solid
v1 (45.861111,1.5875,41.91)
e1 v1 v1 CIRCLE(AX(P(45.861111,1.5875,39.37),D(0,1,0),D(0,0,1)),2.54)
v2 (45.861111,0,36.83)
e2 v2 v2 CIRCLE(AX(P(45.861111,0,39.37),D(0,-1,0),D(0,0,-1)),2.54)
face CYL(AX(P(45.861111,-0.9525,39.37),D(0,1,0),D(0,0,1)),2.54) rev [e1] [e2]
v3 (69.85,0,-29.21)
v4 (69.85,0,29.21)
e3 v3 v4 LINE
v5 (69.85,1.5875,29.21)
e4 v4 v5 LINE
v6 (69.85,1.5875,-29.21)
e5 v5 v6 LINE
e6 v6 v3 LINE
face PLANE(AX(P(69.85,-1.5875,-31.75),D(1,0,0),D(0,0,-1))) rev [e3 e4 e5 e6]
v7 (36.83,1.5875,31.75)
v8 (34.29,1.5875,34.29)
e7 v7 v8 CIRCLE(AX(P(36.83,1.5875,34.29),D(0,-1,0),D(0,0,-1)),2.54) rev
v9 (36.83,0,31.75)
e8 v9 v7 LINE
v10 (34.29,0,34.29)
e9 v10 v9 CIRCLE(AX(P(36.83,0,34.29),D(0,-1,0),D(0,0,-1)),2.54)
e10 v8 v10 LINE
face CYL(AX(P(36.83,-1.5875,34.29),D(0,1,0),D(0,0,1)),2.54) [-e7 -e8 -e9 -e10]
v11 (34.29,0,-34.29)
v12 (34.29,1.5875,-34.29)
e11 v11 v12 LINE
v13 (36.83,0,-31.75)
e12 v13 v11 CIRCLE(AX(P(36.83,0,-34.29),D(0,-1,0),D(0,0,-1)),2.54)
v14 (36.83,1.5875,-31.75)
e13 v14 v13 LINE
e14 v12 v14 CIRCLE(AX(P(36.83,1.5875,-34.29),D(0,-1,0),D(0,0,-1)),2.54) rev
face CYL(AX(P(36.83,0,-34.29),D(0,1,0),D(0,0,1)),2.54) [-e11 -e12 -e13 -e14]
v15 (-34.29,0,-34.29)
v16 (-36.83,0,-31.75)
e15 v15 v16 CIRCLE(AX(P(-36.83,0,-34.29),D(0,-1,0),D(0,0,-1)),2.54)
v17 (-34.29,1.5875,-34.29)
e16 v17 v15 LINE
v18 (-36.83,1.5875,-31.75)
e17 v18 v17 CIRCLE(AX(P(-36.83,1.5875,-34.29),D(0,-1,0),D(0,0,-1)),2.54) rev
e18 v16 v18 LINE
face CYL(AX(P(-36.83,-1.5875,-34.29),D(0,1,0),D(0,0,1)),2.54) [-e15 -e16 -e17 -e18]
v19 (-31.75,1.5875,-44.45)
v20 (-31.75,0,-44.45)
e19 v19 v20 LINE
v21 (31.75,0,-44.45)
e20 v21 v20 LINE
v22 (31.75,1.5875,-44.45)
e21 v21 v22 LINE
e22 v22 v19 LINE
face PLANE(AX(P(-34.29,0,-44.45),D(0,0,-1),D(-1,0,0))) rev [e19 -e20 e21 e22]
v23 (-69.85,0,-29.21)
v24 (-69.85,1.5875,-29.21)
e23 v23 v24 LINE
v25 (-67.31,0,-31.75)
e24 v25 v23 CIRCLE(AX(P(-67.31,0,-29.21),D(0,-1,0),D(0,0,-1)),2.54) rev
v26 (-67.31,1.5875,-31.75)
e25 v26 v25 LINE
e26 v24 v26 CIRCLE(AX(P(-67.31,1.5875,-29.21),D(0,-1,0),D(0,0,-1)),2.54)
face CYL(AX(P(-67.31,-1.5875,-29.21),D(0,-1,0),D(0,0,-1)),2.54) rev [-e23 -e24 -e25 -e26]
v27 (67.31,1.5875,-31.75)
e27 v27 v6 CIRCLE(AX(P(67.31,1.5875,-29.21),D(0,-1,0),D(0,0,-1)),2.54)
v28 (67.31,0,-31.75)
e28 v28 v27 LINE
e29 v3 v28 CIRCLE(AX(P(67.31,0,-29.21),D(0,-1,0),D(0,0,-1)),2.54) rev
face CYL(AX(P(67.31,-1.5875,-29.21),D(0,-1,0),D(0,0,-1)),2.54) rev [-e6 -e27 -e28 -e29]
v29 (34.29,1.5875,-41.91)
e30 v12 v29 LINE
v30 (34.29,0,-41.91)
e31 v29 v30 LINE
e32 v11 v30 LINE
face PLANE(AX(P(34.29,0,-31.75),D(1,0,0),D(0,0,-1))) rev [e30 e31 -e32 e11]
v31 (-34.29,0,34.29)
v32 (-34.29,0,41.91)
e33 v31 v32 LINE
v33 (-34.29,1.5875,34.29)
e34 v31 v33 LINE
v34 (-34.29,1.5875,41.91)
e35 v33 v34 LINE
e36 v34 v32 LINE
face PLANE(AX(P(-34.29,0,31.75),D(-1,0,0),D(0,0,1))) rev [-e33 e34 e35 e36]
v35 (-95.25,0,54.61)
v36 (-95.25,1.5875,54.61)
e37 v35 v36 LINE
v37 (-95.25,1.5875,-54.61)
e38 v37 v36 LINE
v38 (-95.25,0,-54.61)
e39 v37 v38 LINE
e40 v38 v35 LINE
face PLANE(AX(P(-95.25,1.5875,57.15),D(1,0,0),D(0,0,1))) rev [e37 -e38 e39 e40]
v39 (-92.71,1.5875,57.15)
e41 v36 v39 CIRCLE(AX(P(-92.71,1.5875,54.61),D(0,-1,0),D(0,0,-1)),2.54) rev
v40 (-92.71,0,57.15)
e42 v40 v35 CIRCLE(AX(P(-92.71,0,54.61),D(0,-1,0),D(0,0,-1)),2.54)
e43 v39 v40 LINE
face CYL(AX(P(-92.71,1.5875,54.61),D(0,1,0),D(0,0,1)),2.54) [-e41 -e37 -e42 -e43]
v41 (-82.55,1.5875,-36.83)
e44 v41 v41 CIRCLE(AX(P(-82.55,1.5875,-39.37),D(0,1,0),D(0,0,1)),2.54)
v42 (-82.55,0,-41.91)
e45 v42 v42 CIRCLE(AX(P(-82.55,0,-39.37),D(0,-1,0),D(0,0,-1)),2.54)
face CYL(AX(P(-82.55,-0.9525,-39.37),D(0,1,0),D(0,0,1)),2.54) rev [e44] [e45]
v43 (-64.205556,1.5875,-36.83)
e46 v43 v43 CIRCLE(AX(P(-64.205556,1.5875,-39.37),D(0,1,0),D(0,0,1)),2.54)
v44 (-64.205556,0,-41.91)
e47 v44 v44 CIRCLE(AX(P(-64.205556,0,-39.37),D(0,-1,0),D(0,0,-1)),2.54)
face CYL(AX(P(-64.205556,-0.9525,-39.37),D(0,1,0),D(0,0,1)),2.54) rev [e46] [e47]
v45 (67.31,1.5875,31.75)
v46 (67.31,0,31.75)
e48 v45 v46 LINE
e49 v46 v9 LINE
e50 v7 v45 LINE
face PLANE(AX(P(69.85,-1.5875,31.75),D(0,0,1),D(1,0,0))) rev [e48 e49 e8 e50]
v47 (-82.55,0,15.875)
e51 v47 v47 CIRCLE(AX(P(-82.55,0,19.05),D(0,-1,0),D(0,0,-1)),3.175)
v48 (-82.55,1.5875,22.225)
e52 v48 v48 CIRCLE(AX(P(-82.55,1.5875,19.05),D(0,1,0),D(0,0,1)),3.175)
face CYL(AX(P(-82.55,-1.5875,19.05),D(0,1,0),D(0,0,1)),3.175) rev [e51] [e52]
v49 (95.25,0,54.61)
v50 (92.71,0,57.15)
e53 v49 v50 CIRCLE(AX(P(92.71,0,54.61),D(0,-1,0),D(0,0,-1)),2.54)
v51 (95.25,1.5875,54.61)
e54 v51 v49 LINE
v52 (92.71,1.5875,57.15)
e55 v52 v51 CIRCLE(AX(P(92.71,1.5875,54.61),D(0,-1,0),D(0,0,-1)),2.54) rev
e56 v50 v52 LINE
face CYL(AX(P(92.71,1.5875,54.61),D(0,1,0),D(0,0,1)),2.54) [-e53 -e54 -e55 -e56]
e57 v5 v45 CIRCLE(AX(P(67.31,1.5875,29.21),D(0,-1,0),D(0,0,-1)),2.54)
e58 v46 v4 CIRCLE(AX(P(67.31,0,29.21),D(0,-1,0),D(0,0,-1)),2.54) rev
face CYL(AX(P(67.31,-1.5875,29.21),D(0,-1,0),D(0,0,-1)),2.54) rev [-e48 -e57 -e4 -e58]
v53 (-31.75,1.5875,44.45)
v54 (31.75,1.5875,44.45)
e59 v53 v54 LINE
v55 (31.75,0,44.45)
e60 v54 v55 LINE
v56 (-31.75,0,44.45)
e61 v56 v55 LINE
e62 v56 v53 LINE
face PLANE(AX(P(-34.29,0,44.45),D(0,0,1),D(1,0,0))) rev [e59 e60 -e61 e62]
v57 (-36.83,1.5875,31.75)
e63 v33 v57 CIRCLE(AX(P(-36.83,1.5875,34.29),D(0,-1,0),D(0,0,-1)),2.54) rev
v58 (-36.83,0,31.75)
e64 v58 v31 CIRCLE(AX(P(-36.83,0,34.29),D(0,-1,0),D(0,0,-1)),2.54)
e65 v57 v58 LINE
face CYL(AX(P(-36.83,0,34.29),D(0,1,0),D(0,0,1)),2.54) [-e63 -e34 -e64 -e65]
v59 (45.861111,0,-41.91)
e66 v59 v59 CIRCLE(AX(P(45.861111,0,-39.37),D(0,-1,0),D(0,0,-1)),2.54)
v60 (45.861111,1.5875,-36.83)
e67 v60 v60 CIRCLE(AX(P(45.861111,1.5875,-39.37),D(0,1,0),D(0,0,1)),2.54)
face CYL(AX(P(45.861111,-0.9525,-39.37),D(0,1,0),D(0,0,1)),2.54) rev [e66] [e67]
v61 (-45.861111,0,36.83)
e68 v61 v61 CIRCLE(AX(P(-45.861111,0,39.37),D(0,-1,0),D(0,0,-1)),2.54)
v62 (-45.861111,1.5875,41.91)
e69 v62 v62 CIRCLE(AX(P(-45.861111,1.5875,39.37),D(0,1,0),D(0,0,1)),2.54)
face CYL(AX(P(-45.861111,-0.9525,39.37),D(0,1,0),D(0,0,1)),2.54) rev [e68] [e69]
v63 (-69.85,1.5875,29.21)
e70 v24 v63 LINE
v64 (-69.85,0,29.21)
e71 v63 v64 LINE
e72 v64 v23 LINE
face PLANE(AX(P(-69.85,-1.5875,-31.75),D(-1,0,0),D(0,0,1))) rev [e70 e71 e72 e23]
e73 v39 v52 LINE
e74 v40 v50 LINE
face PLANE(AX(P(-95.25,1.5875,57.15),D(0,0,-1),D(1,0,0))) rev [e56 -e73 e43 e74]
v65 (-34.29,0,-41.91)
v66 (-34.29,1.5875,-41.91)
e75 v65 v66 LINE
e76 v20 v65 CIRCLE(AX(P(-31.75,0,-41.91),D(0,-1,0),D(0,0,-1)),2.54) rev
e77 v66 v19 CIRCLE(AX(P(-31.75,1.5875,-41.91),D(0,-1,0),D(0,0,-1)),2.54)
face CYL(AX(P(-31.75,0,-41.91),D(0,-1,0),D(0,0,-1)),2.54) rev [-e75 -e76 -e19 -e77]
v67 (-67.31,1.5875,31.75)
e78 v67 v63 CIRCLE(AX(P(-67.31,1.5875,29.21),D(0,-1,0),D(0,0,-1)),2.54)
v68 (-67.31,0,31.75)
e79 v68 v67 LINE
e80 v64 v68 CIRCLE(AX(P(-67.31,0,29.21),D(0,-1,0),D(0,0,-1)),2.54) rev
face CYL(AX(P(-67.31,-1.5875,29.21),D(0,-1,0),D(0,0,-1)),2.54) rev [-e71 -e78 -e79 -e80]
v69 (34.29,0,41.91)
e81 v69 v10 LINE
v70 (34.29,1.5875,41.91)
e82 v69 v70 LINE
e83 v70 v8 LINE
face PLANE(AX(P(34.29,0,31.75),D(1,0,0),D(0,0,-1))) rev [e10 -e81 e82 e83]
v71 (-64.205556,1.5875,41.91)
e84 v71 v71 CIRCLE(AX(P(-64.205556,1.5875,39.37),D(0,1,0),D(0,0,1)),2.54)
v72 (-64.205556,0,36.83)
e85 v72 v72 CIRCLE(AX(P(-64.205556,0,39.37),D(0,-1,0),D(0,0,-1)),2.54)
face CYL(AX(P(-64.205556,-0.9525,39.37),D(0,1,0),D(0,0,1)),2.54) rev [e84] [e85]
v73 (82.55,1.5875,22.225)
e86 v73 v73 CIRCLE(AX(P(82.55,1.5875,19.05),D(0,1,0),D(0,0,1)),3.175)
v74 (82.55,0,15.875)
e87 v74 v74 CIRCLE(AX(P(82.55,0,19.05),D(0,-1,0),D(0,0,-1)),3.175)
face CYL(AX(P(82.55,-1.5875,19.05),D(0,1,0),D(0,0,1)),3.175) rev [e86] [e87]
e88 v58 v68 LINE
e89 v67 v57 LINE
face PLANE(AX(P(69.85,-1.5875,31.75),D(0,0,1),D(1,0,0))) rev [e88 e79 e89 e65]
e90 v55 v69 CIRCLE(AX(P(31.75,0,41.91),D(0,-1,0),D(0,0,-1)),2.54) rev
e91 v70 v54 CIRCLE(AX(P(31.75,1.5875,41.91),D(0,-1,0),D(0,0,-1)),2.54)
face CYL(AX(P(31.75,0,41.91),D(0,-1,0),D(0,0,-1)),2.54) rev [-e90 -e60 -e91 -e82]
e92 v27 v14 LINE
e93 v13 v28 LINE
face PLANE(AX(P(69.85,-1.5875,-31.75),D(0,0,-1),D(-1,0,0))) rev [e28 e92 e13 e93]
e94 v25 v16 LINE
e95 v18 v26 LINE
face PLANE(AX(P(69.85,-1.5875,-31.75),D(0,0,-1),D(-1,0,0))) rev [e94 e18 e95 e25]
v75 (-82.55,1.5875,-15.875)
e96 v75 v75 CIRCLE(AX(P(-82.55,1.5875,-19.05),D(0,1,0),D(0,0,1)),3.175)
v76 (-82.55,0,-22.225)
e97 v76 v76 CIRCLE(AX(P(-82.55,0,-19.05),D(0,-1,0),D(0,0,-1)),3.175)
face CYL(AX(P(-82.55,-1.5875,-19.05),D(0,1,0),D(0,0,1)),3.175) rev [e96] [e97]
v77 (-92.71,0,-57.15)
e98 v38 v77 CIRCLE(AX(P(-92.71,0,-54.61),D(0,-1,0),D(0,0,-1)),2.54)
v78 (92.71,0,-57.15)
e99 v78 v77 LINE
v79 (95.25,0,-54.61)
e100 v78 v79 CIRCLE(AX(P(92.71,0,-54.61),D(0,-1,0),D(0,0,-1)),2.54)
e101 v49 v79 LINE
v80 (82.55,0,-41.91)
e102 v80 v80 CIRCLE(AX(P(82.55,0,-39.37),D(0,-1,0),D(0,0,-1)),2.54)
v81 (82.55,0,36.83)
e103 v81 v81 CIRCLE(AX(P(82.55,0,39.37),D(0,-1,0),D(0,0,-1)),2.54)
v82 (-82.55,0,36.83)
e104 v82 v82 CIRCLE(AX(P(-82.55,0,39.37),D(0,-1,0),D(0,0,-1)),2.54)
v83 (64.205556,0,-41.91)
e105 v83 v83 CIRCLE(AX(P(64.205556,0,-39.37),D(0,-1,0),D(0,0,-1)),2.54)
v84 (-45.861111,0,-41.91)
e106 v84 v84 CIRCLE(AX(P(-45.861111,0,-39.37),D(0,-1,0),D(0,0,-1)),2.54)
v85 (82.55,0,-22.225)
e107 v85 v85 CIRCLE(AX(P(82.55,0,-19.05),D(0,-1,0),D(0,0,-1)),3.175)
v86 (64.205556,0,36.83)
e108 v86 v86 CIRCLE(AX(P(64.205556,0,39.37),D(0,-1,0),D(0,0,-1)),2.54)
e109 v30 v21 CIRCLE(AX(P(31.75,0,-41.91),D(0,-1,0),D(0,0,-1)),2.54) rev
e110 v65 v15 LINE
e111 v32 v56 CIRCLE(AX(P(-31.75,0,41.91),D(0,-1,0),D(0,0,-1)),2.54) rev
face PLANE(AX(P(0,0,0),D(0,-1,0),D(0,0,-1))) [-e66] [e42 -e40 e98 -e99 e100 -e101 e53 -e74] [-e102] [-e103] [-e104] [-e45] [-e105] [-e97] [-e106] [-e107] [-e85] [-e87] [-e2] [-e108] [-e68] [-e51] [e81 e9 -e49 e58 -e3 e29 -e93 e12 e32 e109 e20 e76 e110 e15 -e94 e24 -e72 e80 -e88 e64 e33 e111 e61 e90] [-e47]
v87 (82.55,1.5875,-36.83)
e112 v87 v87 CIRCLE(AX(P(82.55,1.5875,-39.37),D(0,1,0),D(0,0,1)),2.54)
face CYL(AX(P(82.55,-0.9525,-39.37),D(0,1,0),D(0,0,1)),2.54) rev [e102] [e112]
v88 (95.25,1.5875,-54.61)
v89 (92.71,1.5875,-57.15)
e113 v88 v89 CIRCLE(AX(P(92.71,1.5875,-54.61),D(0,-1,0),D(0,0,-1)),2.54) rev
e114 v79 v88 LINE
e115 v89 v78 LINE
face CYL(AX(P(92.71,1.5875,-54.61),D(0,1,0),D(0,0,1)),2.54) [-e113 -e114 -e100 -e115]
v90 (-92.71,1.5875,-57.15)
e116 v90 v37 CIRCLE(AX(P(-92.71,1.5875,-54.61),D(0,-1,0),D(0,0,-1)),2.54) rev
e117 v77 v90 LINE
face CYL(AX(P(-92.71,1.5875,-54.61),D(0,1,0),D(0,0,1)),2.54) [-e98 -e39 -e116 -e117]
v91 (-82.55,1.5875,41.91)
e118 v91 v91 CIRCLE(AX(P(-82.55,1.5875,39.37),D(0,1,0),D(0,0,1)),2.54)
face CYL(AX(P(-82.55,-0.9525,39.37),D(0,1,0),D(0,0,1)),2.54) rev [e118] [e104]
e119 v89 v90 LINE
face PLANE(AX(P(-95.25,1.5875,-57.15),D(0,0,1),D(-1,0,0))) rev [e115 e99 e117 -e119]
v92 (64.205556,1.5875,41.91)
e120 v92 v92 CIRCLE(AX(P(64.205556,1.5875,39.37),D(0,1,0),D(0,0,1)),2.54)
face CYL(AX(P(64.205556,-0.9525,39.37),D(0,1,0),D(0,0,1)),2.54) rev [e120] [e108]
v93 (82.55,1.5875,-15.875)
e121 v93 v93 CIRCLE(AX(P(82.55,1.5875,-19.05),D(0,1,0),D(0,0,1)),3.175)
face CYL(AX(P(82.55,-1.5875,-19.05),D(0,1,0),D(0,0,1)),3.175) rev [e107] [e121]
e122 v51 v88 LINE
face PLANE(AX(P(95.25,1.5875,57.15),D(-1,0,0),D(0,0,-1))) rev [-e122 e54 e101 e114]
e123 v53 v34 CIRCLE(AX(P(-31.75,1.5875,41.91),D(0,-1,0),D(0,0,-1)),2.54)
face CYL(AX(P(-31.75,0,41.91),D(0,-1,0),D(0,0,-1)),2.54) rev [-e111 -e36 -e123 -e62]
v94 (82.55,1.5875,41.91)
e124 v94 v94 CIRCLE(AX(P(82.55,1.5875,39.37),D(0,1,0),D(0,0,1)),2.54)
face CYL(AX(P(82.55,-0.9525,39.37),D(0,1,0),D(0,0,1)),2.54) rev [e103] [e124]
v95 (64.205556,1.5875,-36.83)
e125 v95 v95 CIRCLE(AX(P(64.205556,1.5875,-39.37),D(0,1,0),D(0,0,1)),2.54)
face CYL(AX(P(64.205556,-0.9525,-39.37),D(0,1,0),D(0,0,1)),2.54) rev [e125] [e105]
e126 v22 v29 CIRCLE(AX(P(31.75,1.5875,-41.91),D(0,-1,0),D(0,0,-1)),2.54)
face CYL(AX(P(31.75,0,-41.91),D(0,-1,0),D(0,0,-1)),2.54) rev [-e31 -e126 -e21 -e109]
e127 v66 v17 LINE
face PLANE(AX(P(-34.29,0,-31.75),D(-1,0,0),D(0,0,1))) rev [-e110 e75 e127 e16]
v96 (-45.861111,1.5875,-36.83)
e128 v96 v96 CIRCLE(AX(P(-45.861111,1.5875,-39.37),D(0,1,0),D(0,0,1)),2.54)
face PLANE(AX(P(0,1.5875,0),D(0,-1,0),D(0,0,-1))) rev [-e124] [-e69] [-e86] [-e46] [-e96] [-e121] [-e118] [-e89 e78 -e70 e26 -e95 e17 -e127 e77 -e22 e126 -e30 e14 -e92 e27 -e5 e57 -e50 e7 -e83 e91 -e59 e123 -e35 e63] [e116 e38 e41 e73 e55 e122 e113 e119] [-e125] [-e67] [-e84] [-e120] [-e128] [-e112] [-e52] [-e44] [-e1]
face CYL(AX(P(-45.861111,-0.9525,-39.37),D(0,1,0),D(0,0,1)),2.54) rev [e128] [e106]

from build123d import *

# Parameters (mm, degrees)
SKETCH1_W           = 190.5
SKETCH1_H           = 114.3
BOSS_EXTRUDE1_DEPTH = 1.5875
SKETCH6_W           = 139.7
SKETCH6_H           = 63.5
CUT_EXTRUDE1_DEPTH  = 3.175
FILLET1_R           = 2.54
SKETCH7_R           = 3.175
CUT_EXTRUDE2_DEPTH  = 3.175
SKETCH8_R           = 2.54
CUT_EXTRUDE3_DEPTH  = 2.54
SKETCH9_R           = 2.54
CUT_EXTRUDE4_DEPTH  = 2.54
SKETCH10_W          = 68.58
SKETCH10_H          = 12.7
CUT_EXTRUDE5_DEPTH  = 112.090976934
FILLET2_R           = 2.54


with BuildPart() as part:
    # Sketch1 → Boss-Extrude1 (new body)
    with BuildSketch(Plane(origin=(0, 0, 0), x_dir=(1, 0, 0), z_dir=(0, 1, 0))):
        Rectangle(SKETCH1_W, SKETCH1_H)
    extrude(amount=BOSS_EXTRUDE1_DEPTH)

    # Sketch6 → Cut-Extrude1 (cut)
    with BuildSketch(Plane(origin=(0, 1.5875, 0), x_dir=(1, 0, 0), z_dir=(0, 1, 0))):
        Rectangle(SKETCH6_W, SKETCH6_H)
    extrude(amount=-CUT_EXTRUDE1_DEPTH, mode=Mode.SUBTRACT)

    # Fillet1
    fillet1_edges = [part.edges().sort_by_distance(p)[0] for p in [
        (-69.85, 0.79375, 31.75),
        (-69.85, 0.79375, -31.75),
        (69.85, 0.79375, -31.75),
        (69.85, 0.79375, 31.75),
        (95.25, 0.79375, -57.15),
        (95.25, 0.79375, 57.15),
        (-95.25, 0.79375, 57.15),
        (-95.25, 0.79375, -57.15),
    ]]
    fillet(fillet1_edges, radius=FILLET1_R)

    # Sketch7 → Cut-Extrude2 (cut)
    with BuildSketch(Plane(origin=(0, 1.5875, 0), x_dir=(1, 0, 0), z_dir=(0, 1, 0))):
        with Locations(Location((-82.55, 19.05, 0), (0, 0, 270))):
            Circle(SKETCH7_R)
        with Locations(Location((-82.55, -19.05, 0), (0, 0, 270))):
            Circle(SKETCH7_R)
        with Locations(Location((82.55, -19.05, 0), (0, 0, 270))):
            Circle(SKETCH7_R)
        with Locations(Location((82.55, 19.05, 0), (0, 0, 270))):
            Circle(SKETCH7_R)
    extrude(amount=-CUT_EXTRUDE2_DEPTH, mode=Mode.SUBTRACT)

    # Sketch8 → Cut-Extrude3 (cut)
    with BuildSketch(Plane(origin=(0, 1.5875, 0), x_dir=(1, 0, 0), z_dir=(0, 1, 0))):
        with Locations(Location((82.55, 39.37, 0), (0, 0, 270))):
            Circle(SKETCH8_R)
        with Locations(Location((64.205555556, 39.37, 0), (0, 0, 270))):
            Circle(SKETCH8_R)
        with Locations(Location((45.861111111, 39.37, 0), (0, 0, 270))):
            Circle(SKETCH8_R)
        with Locations(Location((27.516666667, 39.37, 0), (0, 0, 270))):
            Circle(SKETCH8_R)
        with Locations(Location((9.172222222, 39.37, 0), (0, 0, 270))):
            Circle(SKETCH8_R)
        with Locations(Location((-9.172222222, 39.37, 0), (0, 0, 270))):
            Circle(SKETCH8_R)
        with Locations(Location((-27.516666667, 39.37, 0), (0, 0, 270))):
            Circle(SKETCH8_R)
        with Locations(Location((-45.861111111, 39.37, 0), (0, 0, 270))):
            Circle(SKETCH8_R)
        with Locations(Location((-64.205555556, 39.37, 0), (0, 0, 270))):
            Circle(SKETCH8_R)
        with Locations(Location((-82.55, 39.37, 0), (0, 0, 270))):
            Circle(SKETCH8_R)
    extrude(amount=-CUT_EXTRUDE3_DEPTH, mode=Mode.SUBTRACT)

    # Sketch9 → Cut-Extrude4 (cut)
    with BuildSketch(Plane(origin=(0, 1.5875, 0), x_dir=(1, 0, 0), z_dir=(0, 1, 0))):
        with Locations(Location((82.55, -39.37, 0), (0, 0, 270))):
            Circle(SKETCH9_R)
        with Locations(Location((64.205555556, -39.37, 0), (0, 0, 270))):
            Circle(SKETCH9_R)
        with Locations(Location((45.861111111, -39.37, 0), (0, 0, 270))):
            Circle(SKETCH9_R)
        with Locations(Location((27.516666667, -39.37, 0), (0, 0, 270))):
            Circle(SKETCH9_R)
        with Locations(Location((9.172222222, -39.37, 0), (0, 0, 270))):
            Circle(SKETCH9_R)
        with Locations(Location((-9.172222222, -39.37, 0), (0, 0, 270))):
            Circle(SKETCH9_R)
        with Locations(Location((-27.516666667, -39.37, 0), (0, 0, 270))):
            Circle(SKETCH9_R)
        with Locations(Location((-45.861111111, -39.37, 0), (0, 0, 270))):
            Circle(SKETCH9_R)
        with Locations(Location((-64.205555556, -39.37, 0), (0, 0, 270))):
            Circle(SKETCH9_R)
        with Locations(Location((-82.55, -39.37, 0), (0, 0, 270))):
            Circle(SKETCH9_R)
    extrude(amount=-CUT_EXTRUDE4_DEPTH, mode=Mode.SUBTRACT)

    # Sketch10 → Cut-Extrude5 (cut, through all)
    with BuildSketch(Plane(origin=(0, 1.5875, 0), x_dir=(1, 0, 0), z_dir=(0, 1, 0))):
        with Locations((0, -38.1)):
            Rectangle(SKETCH10_W, SKETCH10_H)
        with Locations((0, 38.1)):
            Rectangle(SKETCH10_W, SKETCH10_H)
    extrude(amount=-CUT_EXTRUDE5_DEPTH, mode=Mode.SUBTRACT)

    # Fillet2
    fillet2_edges = [part.edges().sort_by_distance(p)[0] for p in [
        (-34.29, 0.79375, 44.45),
        (-34.29, 0.79375, 31.75),
        (34.29, 0.79375, 31.75),
        (34.29, 0.79375, 44.45),
        (-34.29, 0.79375, -31.75),
        (-34.29, 0.79375, -44.45),
        (34.29, 0.79375, -44.45),
        (34.29, 0.79375, -31.75),
    ]]
    fillet(fillet2_edges, radius=FILLET2_R)


solid = part.part
